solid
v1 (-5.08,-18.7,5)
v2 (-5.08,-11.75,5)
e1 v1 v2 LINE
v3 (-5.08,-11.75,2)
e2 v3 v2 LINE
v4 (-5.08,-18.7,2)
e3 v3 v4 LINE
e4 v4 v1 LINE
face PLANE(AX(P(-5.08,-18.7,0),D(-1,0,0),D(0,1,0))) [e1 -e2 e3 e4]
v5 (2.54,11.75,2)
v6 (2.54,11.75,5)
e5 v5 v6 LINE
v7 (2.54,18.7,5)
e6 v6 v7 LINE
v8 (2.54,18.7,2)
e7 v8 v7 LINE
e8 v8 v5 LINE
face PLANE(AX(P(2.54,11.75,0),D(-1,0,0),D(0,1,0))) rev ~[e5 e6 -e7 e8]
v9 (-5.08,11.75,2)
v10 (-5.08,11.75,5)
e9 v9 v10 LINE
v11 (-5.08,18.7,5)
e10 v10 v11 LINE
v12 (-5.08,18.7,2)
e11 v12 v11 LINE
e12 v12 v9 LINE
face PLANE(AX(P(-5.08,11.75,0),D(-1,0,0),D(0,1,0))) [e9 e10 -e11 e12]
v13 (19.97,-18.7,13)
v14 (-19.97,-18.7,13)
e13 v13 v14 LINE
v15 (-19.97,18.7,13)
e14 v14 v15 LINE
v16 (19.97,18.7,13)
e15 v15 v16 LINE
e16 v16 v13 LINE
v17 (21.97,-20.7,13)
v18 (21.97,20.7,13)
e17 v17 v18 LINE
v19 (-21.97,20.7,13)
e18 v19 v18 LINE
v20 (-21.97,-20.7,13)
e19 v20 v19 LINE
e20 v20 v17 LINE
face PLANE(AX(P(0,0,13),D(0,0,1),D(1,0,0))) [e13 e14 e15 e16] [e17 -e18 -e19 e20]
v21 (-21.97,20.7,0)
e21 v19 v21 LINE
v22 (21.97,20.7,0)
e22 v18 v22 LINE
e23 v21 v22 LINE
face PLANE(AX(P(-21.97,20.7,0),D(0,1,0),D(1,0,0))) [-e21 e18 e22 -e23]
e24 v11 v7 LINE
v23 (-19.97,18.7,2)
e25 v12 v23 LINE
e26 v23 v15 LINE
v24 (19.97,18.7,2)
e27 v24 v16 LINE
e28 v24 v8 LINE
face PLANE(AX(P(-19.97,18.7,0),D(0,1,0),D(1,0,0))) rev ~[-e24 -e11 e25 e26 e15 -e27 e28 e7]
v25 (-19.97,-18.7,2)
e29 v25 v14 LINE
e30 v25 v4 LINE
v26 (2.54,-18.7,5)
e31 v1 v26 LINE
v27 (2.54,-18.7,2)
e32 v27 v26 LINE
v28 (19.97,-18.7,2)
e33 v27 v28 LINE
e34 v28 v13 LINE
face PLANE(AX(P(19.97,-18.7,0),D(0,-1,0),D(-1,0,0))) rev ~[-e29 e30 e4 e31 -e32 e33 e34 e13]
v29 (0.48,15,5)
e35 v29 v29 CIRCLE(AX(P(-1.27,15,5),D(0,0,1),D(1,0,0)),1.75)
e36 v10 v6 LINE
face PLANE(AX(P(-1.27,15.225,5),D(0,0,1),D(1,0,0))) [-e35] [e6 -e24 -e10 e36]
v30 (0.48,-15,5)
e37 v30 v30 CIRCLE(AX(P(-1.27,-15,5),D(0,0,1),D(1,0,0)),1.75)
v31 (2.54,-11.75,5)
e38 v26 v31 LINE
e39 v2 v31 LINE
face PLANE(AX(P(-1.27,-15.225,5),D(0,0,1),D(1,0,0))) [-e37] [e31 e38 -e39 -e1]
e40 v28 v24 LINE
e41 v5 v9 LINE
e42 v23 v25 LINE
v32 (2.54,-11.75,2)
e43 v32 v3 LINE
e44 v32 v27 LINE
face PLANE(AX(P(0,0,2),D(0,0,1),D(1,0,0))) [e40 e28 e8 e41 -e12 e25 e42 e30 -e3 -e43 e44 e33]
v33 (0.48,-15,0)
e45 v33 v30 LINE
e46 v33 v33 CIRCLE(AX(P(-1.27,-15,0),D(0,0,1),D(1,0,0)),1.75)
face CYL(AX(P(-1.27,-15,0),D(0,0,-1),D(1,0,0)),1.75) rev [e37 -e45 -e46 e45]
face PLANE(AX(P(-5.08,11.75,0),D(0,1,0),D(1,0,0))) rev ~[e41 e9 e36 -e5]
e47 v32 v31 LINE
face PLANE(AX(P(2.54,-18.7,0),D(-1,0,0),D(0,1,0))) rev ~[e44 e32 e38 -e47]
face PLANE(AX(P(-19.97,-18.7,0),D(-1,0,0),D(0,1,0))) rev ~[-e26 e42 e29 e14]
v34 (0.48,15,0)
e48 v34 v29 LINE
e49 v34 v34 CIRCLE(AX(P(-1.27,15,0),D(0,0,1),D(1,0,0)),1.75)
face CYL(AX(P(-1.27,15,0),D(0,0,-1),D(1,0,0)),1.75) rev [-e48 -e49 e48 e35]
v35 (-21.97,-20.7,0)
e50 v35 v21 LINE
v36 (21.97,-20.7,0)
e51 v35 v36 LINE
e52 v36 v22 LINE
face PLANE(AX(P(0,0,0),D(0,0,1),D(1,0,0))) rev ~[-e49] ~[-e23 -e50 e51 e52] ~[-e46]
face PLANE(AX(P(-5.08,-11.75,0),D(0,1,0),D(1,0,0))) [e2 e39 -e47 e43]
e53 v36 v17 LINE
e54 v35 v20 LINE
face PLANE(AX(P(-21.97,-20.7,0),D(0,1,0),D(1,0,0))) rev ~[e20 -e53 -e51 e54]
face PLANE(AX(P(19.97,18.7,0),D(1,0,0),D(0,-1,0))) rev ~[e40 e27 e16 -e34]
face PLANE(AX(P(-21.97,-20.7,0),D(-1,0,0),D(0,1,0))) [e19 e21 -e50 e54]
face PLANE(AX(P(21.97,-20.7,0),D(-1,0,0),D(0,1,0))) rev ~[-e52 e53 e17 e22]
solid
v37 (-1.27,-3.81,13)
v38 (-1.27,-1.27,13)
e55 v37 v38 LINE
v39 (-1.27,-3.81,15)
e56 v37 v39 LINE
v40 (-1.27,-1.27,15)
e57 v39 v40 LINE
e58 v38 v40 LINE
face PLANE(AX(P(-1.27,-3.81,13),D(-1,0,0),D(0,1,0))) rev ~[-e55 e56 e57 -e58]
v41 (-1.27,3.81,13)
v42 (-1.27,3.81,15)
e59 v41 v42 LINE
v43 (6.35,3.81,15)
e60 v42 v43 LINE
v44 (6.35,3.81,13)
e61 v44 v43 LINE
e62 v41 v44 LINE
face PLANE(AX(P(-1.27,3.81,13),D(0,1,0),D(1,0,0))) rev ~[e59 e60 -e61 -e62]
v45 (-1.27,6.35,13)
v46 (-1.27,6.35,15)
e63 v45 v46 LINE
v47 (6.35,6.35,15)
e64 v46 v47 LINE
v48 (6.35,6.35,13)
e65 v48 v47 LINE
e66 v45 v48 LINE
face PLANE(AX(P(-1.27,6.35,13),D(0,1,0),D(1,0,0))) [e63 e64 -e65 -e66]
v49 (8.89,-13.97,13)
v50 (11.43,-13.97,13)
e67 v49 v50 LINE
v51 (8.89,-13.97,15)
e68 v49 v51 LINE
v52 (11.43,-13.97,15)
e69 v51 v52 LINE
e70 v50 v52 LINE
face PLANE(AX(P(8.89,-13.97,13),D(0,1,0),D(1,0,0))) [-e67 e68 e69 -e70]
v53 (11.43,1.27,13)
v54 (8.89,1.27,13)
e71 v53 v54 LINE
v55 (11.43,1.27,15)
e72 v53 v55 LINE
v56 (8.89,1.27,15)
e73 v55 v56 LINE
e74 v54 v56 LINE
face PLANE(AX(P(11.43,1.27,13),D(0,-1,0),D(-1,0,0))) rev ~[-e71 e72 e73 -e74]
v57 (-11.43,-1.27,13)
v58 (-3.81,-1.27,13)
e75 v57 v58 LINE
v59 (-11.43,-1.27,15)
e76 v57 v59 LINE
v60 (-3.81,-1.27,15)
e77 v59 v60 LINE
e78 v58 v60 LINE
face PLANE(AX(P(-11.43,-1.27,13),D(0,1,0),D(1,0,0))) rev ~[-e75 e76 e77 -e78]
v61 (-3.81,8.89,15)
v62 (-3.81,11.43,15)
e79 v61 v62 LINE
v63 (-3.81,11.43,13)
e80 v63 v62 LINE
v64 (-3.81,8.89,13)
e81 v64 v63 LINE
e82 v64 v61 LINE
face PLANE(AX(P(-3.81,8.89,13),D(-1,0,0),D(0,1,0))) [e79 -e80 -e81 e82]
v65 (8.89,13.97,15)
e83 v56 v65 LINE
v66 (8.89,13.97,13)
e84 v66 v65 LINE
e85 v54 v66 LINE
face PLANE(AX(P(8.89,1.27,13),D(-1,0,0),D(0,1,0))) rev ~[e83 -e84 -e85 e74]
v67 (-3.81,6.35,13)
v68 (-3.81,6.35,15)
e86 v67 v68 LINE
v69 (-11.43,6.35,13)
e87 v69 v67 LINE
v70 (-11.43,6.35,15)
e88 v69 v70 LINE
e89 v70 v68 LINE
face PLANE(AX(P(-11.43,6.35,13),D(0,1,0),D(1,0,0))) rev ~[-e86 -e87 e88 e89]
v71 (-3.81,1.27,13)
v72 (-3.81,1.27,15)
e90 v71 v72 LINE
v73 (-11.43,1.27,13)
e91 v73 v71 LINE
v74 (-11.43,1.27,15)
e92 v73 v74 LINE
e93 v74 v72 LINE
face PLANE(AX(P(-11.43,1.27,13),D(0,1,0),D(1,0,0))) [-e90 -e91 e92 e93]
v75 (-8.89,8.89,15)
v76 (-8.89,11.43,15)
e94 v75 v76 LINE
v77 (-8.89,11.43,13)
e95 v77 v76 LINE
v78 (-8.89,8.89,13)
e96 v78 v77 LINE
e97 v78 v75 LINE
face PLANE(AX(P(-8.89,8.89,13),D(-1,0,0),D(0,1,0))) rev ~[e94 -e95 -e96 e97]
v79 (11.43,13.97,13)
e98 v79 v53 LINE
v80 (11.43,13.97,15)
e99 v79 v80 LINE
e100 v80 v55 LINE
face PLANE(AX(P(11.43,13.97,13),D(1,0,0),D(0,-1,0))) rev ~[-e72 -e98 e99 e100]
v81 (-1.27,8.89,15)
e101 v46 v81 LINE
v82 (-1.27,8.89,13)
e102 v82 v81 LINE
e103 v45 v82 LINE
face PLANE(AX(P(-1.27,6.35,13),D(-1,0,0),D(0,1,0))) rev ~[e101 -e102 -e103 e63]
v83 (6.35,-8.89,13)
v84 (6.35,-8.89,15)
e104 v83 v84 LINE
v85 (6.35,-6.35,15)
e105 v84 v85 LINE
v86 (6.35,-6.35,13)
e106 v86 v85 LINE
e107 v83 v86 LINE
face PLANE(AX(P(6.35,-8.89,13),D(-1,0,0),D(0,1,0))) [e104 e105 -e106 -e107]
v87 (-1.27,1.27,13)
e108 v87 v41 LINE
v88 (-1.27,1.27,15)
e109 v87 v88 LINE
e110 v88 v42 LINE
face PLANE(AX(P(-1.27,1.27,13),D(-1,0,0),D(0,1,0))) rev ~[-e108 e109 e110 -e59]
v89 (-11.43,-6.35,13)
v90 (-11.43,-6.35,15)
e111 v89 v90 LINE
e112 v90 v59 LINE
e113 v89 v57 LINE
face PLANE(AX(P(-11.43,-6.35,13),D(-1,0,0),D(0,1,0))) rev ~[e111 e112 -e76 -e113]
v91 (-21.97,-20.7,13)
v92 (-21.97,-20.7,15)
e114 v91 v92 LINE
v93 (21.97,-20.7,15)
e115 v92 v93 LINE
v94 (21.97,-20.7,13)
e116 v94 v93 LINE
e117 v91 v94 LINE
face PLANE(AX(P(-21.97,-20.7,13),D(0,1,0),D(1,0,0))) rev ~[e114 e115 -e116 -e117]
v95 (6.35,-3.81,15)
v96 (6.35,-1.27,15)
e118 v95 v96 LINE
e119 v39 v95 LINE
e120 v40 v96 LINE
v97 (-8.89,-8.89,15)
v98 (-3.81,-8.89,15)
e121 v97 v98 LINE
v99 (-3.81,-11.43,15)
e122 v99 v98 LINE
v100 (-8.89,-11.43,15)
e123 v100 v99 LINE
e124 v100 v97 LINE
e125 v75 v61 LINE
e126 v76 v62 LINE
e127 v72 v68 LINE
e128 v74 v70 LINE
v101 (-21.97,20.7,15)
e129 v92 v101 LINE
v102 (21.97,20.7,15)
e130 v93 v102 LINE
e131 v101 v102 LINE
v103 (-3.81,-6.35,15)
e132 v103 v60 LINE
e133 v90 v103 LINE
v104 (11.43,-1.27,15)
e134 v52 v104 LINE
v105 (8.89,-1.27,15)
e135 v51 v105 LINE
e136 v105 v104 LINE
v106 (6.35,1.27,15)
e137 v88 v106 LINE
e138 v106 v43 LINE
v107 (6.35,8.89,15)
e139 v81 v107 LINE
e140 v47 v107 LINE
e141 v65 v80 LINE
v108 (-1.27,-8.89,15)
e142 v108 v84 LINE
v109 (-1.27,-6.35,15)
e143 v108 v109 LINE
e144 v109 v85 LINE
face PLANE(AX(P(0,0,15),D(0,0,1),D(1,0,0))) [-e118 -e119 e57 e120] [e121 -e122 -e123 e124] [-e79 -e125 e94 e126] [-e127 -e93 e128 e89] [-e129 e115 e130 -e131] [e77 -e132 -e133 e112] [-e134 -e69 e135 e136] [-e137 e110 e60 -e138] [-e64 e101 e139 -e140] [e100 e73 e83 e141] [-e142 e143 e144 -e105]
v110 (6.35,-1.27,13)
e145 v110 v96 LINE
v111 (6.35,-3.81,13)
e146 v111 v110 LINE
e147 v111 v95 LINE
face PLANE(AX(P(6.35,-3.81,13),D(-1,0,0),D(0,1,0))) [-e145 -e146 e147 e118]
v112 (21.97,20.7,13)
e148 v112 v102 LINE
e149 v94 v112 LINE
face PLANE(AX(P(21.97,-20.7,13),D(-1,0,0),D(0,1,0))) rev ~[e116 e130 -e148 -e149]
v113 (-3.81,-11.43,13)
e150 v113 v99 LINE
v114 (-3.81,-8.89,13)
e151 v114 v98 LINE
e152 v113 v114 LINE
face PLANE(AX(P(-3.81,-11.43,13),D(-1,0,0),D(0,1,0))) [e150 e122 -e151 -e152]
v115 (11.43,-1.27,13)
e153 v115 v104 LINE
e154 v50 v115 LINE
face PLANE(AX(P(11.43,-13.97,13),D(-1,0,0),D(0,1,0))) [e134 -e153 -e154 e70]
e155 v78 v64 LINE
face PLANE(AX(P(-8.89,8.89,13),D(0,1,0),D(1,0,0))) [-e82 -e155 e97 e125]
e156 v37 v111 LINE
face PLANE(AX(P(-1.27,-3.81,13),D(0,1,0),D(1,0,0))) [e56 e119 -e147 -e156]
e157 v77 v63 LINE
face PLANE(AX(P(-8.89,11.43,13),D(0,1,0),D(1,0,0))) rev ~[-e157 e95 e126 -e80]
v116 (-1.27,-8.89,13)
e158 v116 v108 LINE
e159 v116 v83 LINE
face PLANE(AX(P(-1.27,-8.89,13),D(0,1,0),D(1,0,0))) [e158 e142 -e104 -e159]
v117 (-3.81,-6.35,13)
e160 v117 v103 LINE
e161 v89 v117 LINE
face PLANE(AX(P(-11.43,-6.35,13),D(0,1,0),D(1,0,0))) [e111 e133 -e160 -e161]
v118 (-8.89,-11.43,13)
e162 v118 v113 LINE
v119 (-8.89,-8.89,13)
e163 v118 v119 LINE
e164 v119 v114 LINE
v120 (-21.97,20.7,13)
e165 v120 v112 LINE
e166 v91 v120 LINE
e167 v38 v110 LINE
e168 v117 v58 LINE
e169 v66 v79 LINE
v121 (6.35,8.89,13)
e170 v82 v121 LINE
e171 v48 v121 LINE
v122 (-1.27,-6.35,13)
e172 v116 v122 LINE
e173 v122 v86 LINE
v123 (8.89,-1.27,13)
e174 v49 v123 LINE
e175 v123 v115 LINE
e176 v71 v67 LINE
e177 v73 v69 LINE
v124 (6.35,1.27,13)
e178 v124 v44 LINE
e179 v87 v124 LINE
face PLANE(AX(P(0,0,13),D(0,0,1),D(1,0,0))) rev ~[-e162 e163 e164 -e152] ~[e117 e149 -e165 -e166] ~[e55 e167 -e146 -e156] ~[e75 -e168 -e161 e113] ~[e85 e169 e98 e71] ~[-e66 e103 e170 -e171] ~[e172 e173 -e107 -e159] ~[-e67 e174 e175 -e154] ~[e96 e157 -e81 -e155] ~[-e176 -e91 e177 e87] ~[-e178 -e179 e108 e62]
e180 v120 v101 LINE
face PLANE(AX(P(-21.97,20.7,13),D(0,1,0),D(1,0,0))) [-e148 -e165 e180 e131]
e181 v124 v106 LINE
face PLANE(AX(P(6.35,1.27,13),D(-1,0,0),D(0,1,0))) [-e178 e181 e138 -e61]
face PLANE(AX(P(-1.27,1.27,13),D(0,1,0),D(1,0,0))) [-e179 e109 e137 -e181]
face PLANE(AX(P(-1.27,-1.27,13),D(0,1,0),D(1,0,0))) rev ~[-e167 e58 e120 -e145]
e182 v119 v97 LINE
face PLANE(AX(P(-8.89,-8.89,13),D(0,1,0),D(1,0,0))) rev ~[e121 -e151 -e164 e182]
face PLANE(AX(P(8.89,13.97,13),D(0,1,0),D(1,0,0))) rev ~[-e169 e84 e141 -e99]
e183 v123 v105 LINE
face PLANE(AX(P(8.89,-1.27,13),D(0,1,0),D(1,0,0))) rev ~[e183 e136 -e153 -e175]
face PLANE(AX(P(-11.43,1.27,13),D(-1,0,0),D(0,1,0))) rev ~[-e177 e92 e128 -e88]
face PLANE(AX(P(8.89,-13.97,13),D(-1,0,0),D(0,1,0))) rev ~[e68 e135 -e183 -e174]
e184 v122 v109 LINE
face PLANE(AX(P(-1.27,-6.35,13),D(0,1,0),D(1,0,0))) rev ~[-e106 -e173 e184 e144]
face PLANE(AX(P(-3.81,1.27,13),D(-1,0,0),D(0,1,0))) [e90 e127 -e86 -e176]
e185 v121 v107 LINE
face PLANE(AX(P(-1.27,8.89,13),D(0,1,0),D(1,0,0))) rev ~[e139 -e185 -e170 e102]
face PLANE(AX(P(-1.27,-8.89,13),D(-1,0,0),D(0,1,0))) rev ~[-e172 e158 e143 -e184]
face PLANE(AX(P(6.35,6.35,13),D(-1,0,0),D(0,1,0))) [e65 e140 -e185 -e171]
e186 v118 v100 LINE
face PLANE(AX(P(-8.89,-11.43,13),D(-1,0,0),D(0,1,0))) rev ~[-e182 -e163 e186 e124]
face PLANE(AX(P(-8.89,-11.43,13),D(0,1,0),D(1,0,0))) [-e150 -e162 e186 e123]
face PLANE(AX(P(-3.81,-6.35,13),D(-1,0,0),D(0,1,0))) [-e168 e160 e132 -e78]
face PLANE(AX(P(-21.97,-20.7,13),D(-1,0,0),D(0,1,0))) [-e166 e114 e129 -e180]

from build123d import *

# Parameters (mm, degrees)
F0_W     = 43.94
F0_H     = 41.4
F0_W_2   = 7.62
F0_H_2   = 6.95
F0_R     = 1.75
F1_DEPTH = 2
F2_DEPTH = 13
F3_DEPTH = 5
F4_W     = 43.94
F4_H     = 41.4
F4_W_2   = 5.08
F4_H_2   = 2.54
F4_W_3   = 7.62
F4_H_3   = 5.08
F4_W_4   = 2.54
F4_H_4   = 12.7
F5_DEPTH = 2


with BuildPart() as f1:
    # F0 (on Top) → F1 (new body)
    with BuildSketch(Plane.XY):
        Rectangle(F0_W, F0_H)
        Polygon((-19.97, -18.7), (-19.97, 18.7), (-5.08, 18.7), (2.54, 18.7), (19.97, 18.7), (19.97, -18.7), (2.54, -18.7), (-5.08, -18.7), align=None, mode=Mode.SUBTRACT)
        Polygon((-5.08, 18.7), (-19.97, 18.7), (-19.97, -18.7), (-5.08, -18.7), (-5.08, -11.75), (2.54, -11.75), (2.54, -18.7), (19.97, -18.7), (19.97, 18.7), (2.54, 18.7), (2.54, 11.75), (-5.08, 11.75), align=None)
        with Locations((-1.27, 15.225)):
            Rectangle(F0_W_2, F0_H_2)
        with Locations((-1.27, 15)):
            Circle(F0_R, mode=Mode.SUBTRACT)
        with Locations((-1.27, -15.225)):
            Rectangle(F0_W_2, F0_H_2)
        with Locations((-1.27, -15)):
            Circle(F0_R, mode=Mode.SUBTRACT)
    extrude(amount=F1_DEPTH)

    # F0 (on Top) → F2 (join)
    with BuildSketch(Plane.XY):
        Rectangle(F0_W, F0_H)
        Polygon((-19.97, -18.7), (-19.97, 18.7), (-5.08, 18.7), (2.54, 18.7), (19.97, 18.7), (19.97, -18.7), (2.54, -18.7), (-5.08, -18.7), align=None, mode=Mode.SUBTRACT)
    extrude(amount=F2_DEPTH)

    # F0 (on Top) → F3 (join)
    with BuildSketch(Plane.XY):
        with Locations((-1.27, 15.225)):
            Rectangle(F0_W_2, F0_H_2)
        with Locations((-1.27, 15)):
            Circle(F0_R, mode=Mode.SUBTRACT)
        with Locations((-1.27, -15.225)):
            Rectangle(F0_W_2, F0_H_2)
        with Locations((-1.27, -15)):
            Circle(F0_R, mode=Mode.SUBTRACT)
    extrude(amount=F3_DEPTH)


with BuildPart() as f5:
    # F4 (on face) → F5 (new body)
    with BuildSketch(Plane.XY.offset(13)):
        Rectangle(F4_W, F4_H)
        with Locations((-6.35, -10.16)):
            Rectangle(F4_W_2, F4_H_2, mode=Mode.SUBTRACT)
        with Locations((-7.62, -3.81)):
            Rectangle(F4_W_3, F4_H_3, mode=Mode.SUBTRACT)
        with Locations((2.54, -7.62)):
            Rectangle(F4_W_3, F4_H_2, mode=Mode.SUBTRACT)
        with Locations((10.16, -7.62)):
            Rectangle(F4_W_4, F4_H_4, mode=Mode.SUBTRACT)
        with Locations((2.54, -2.54)):
            Rectangle(F4_W_3, F4_H_2, mode=Mode.SUBTRACT)
        with Locations((-7.62, 3.81)):
            Rectangle(F4_W_3, F4_H_3, mode=Mode.SUBTRACT)
        with Locations((-6.35, 10.16)):
            Rectangle(F4_W_2, F4_H_2, mode=Mode.SUBTRACT)
        with Locations((2.54, 2.54)):
            Rectangle(F4_W_3, F4_H_2, mode=Mode.SUBTRACT)
        with Locations((2.54, 7.62)):
            Rectangle(F4_W_3, F4_H_2, mode=Mode.SUBTRACT)
        Polygon((8.89, 11.43), (8.89, 13.97), (11.43, 13.97), (11.43, 1.27), (8.89, 1.27), align=None, mode=Mode.SUBTRACT)
    extrude(amount=F5_DEPTH)


solid = Compound([f1.part, f5.part])
